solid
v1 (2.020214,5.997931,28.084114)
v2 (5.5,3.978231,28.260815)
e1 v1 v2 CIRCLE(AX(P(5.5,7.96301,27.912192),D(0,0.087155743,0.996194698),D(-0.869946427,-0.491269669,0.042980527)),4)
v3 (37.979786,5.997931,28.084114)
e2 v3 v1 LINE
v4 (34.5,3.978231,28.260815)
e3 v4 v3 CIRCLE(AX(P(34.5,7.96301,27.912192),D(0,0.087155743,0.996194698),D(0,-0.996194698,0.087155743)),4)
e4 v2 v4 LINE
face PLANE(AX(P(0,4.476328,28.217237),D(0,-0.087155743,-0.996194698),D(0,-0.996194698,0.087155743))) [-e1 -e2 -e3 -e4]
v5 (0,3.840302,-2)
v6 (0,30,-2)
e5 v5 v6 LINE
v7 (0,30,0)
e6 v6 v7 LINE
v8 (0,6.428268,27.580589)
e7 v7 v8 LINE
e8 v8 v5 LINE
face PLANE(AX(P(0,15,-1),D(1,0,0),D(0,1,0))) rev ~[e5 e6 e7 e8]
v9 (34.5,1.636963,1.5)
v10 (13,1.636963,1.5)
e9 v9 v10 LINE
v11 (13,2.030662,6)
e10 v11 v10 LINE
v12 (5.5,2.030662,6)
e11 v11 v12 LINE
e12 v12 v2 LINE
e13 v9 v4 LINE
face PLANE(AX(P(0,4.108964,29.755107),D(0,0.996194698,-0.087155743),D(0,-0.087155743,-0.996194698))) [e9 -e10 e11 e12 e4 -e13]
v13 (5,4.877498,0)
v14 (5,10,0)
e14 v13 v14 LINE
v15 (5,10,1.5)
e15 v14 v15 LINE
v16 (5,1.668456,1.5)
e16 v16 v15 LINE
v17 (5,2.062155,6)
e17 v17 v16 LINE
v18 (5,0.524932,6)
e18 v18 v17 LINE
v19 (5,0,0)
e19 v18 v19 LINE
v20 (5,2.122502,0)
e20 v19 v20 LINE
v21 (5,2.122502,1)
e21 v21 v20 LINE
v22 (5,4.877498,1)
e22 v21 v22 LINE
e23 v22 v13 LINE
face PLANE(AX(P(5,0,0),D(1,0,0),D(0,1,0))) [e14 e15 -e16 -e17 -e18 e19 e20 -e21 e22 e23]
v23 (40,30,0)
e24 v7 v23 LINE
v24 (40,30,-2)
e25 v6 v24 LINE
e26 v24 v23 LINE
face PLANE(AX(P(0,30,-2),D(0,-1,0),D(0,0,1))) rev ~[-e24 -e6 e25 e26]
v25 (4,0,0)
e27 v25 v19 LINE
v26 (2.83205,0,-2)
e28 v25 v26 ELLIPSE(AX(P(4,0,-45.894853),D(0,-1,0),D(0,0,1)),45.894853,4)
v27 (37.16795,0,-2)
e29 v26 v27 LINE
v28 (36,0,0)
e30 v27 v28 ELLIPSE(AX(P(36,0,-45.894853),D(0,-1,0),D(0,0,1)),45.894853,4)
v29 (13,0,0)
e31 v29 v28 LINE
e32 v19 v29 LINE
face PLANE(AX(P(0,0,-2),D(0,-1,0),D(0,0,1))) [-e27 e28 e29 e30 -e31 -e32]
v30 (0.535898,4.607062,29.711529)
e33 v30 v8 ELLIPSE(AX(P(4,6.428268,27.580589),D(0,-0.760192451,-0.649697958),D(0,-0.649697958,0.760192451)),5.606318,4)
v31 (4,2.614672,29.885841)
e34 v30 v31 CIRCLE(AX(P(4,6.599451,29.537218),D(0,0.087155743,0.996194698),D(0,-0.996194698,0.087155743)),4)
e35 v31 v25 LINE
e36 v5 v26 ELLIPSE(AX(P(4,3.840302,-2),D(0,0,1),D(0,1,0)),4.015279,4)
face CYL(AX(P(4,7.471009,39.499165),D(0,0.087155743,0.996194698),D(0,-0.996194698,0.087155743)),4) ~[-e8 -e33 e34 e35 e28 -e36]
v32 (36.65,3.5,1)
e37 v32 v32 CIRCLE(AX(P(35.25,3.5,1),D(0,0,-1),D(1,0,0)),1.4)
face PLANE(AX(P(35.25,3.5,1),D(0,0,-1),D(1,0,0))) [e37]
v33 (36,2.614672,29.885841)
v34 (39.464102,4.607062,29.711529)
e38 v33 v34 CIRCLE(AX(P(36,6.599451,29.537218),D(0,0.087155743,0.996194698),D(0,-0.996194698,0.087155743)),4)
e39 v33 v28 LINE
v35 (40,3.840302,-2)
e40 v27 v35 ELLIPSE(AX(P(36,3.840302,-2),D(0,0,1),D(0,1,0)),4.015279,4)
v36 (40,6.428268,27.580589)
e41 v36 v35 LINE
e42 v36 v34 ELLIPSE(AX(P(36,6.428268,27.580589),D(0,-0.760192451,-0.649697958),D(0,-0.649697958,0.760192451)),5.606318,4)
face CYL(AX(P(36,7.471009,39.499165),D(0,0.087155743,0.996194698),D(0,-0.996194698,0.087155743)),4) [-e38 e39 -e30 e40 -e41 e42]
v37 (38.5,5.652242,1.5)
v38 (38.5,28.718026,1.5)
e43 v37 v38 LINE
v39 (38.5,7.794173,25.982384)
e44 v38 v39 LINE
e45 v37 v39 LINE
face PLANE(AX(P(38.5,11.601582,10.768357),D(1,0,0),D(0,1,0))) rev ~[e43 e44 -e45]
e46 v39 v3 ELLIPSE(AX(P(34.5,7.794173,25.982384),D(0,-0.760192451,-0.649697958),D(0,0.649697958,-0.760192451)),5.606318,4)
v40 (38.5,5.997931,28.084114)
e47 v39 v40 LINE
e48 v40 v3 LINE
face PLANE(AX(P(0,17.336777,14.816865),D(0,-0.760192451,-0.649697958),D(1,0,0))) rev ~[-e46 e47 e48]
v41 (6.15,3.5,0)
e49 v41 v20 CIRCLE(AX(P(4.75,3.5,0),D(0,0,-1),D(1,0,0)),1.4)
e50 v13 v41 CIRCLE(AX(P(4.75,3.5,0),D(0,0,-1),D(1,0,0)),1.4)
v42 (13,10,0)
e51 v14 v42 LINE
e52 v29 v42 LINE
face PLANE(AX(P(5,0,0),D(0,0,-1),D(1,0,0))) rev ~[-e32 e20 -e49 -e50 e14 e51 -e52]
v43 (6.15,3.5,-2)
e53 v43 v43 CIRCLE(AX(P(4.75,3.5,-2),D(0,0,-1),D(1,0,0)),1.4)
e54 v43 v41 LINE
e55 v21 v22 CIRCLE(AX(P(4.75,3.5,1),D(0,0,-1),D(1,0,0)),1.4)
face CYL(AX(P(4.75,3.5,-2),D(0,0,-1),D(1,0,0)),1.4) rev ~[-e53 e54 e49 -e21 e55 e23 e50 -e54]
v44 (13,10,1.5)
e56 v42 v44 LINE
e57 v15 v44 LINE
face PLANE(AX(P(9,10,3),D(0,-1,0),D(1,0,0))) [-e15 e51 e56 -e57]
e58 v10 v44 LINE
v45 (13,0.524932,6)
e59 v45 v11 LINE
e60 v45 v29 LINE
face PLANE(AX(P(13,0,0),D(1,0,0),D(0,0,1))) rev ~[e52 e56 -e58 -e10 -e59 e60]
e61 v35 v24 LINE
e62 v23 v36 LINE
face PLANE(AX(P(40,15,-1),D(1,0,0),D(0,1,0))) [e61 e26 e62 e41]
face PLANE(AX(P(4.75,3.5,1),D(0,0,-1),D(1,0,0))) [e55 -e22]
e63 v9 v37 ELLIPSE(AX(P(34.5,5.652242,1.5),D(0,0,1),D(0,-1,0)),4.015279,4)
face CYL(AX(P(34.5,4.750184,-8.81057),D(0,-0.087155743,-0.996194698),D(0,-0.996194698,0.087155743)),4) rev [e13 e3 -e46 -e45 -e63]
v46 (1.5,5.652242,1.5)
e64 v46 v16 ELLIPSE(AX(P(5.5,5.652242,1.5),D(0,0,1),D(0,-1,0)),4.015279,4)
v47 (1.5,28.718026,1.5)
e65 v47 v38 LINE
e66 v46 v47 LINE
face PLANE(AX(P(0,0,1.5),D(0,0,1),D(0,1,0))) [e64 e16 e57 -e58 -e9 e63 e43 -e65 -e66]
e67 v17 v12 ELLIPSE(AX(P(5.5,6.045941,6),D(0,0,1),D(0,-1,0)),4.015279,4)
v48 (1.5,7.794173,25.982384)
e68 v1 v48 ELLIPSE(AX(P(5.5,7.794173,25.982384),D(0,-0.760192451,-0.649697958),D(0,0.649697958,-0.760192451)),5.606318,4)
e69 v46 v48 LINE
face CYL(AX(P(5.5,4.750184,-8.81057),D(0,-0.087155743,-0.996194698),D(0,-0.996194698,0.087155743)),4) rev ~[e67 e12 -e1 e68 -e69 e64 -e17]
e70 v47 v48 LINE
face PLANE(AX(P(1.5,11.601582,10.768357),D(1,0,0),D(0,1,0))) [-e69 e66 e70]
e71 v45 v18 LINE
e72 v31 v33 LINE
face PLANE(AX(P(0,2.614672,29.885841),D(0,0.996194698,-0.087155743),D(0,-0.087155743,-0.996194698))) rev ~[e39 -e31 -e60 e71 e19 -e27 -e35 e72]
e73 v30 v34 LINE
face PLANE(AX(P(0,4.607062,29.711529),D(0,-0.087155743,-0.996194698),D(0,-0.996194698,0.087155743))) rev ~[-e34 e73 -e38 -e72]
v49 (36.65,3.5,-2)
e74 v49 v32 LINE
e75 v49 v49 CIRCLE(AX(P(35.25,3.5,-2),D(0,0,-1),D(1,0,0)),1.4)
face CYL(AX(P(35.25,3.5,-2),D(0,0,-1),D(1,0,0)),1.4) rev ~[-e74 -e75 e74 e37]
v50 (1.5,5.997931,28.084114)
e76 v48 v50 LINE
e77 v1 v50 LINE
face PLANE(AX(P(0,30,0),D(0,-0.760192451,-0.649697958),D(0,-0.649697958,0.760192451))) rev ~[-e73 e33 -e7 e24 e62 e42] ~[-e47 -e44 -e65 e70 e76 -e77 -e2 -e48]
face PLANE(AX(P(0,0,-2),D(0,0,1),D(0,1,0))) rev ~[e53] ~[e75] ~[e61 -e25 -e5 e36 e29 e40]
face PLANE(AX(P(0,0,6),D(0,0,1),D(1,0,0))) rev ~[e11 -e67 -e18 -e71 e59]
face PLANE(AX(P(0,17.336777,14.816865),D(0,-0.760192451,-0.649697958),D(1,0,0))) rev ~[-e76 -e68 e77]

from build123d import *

# Parameters (mm, degrees)
F1_DEPTH     = 40
F2_T         = -1.5
F0_W         = 30
F0_H         = 2
F3_DEPTH     = 40
F4_W         = 8
F4_H         = 6
F5_DEPTH     = 10
F6_R         = 1.4
F7_DEPTH     = 3
F8_T4_DEPTH  = 36.8630372484
F8_T11_DEPTH = 36.8630372484
F8_T17_DEPTH = 36.8630372484
F8_T20_DEPTH = 90


# Not quite as in the source:
# - a fillet or chamfer that OpenCascade refuses, or shapes differently, is made with other operations: its cross-section is extruded or revolved along the edge and cut away or added


with BuildPart() as f1:
    # F0 (on Right) → F1 (new body)
    with BuildSketch(Plane.YZ):
        Polygon((2.6146722824, 29.8858409428), (0, 0), (30, 0), (4.6070616786, 29.7115294573), align=None)
    extrude(amount=F1_DEPTH)

    # F2
    f2_openings = [f1.faces().sort_by_distance(p)[0] for p in [
        (20, 17.303531, 14.855765),
    ]]
    offset(amount=F2_T, openings=f2_openings)

    # F0 (on Right) → F3 (join)
    with BuildSketch(Plane.YZ):
        with Locations((15, -1)):
            Rectangle(F0_W, F0_H)
    extrude(amount=F3_DEPTH)

    # F4 (on Front) → F5 (cut)
    with BuildSketch(Plane.XZ):
        with Locations((9, 3)):
            Rectangle(F4_W, F4_H)
    extrude(amount=-F5_DEPTH, mode=Mode.SUBTRACT)

    # F6 (on face) → F7 (cut)
    with BuildSketch(Plane(origin=(0, 0, -2), x_dir=(1, 0, 0), z_dir=(0, 0, -1))):
        with Locations((4.75, -3.5)):
            Circle(F6_R)
        with Locations((35.25, -3.5)):
            Circle(F6_R)
    extrude(amount=-F7_DEPTH, mode=Mode.SUBTRACT)

    # F8: fillet of radius 4 on 4 edges, made by hand


with BuildPart() as f8_tool2:
    # F8_s3 → F8_t4 (new body)
    with BuildSketch(Plane(origin=(0, -0.728886723, -8.3312133668), x_dir=(1, 0, 0), z_dir=(0, 0.0871557427, 0.9961946981))):
        with BuildLine():
            ThreePointArc((5.5, 1.5), (2.6715728753, 2.6715728753), (1.5, 5.5))
            Line((1.5, 5.5), (1.5, 1.5))
            Line((1.5, 1.5), (5.5, 1.5))
        make_face()
    extrude(amount=F8_T4_DEPTH)

    split(bisect_by=Plane.YZ.offset(5), keep=Keep.BOTTOM)

    split(bisect_by=Plane(origin=(0, 17.3367768884, 14.8168645055), x_dir=(1, 0, 0), z_dir=(0, -0.7601924513, -0.6496979583)), keep=Keep.TOP)

    split(bisect_by=Plane.XY.offset(1.5), keep=Keep.TOP)


with BuildPart() as f1_1:
    add(f1.part)

    # F8_t1: union F8_tool2
    add(f8_tool2.part)


with BuildPart() as f8_tool9:
    # F8_s10 → F8_t11 (new body)
    with BuildSketch(Plane(origin=(0, -0.728886723, -8.3312133668), x_dir=(1, 0, 0), z_dir=(0, 0.0871557427, 0.9961946981))):
        with BuildLine():
            ThreePointArc((5.5, 1.5), (2.6715728753, 2.6715728753), (1.5, 5.5))
            Line((1.5, 5.5), (1.5, 1.5))
            Line((1.5, 1.5), (5.5, 1.5))
        make_face()
    extrude(amount=F8_T11_DEPTH)

    split(bisect_by=Plane.XY.offset(6), keep=Keep.TOP)

    split(bisect_by=Plane(origin=(0, 17.3367768884, 14.8168645055), x_dir=(1, 0, 0), z_dir=(0, -0.7601924513, -0.6496979583)), keep=Keep.TOP)


with BuildPart() as f1_2:
    add(f1_1.part)

    # F8_t8: union F8_tool9
    add(f8_tool9.part)


with BuildPart() as f8_tool15:
    # F8_s16 → F8_t17 (new body)
    with BuildSketch(Plane(origin=(0, -0.728886723, -8.3312133668), x_dir=(1, 0, 0), z_dir=(0, 0.0871557427, 0.9961946981))):
        with BuildLine():
            ThreePointArc((34.5, 1.5), (37.3284271247, 2.6715728753), (38.5, 5.5))
            Line((38.5, 5.5), (38.5, 1.5))
            Line((38.5, 1.5), (34.5, 1.5))
        make_face()
    extrude(amount=F8_T17_DEPTH)

    split(bisect_by=Plane(origin=(0, 17.3367768884, 14.8168645055), x_dir=(1, 0, 0), z_dir=(0, -0.7601924513, -0.6496979583)), keep=Keep.TOP)

    split(bisect_by=Plane.XY.offset(1.5), keep=Keep.TOP)


with BuildPart() as f1_3:
    add(f1_2.part)

    # F8_t14: union F8_tool15
    add(f8_tool15.part)

    # F8_s21 → F8_t20 (cut)
    with BuildSketch(Plane(origin=(0, 3.4862297099, 39.8477879237), x_dir=(1, 0, 0), z_dir=(0, -0.0871557427, -0.9961946981))):
        with BuildLine():
            ThreePointArc((4, 0), (1.1715728753, -1.1715728753), (0, -4))
            Line((0, -4), (0, 0))
            Line((0, 0), (4, 0))
        make_face()
        with BuildLine():
            ThreePointArc((36, 0), (38.8284271247, -1.1715728753), (40, -4))
            Line((40, -4), (40, 0))
            Line((40, 0), (36, 0))
        make_face()
    extrude(amount=F8_T20_DEPTH, mode=Mode.SUBTRACT)


solid = f1_3.part
